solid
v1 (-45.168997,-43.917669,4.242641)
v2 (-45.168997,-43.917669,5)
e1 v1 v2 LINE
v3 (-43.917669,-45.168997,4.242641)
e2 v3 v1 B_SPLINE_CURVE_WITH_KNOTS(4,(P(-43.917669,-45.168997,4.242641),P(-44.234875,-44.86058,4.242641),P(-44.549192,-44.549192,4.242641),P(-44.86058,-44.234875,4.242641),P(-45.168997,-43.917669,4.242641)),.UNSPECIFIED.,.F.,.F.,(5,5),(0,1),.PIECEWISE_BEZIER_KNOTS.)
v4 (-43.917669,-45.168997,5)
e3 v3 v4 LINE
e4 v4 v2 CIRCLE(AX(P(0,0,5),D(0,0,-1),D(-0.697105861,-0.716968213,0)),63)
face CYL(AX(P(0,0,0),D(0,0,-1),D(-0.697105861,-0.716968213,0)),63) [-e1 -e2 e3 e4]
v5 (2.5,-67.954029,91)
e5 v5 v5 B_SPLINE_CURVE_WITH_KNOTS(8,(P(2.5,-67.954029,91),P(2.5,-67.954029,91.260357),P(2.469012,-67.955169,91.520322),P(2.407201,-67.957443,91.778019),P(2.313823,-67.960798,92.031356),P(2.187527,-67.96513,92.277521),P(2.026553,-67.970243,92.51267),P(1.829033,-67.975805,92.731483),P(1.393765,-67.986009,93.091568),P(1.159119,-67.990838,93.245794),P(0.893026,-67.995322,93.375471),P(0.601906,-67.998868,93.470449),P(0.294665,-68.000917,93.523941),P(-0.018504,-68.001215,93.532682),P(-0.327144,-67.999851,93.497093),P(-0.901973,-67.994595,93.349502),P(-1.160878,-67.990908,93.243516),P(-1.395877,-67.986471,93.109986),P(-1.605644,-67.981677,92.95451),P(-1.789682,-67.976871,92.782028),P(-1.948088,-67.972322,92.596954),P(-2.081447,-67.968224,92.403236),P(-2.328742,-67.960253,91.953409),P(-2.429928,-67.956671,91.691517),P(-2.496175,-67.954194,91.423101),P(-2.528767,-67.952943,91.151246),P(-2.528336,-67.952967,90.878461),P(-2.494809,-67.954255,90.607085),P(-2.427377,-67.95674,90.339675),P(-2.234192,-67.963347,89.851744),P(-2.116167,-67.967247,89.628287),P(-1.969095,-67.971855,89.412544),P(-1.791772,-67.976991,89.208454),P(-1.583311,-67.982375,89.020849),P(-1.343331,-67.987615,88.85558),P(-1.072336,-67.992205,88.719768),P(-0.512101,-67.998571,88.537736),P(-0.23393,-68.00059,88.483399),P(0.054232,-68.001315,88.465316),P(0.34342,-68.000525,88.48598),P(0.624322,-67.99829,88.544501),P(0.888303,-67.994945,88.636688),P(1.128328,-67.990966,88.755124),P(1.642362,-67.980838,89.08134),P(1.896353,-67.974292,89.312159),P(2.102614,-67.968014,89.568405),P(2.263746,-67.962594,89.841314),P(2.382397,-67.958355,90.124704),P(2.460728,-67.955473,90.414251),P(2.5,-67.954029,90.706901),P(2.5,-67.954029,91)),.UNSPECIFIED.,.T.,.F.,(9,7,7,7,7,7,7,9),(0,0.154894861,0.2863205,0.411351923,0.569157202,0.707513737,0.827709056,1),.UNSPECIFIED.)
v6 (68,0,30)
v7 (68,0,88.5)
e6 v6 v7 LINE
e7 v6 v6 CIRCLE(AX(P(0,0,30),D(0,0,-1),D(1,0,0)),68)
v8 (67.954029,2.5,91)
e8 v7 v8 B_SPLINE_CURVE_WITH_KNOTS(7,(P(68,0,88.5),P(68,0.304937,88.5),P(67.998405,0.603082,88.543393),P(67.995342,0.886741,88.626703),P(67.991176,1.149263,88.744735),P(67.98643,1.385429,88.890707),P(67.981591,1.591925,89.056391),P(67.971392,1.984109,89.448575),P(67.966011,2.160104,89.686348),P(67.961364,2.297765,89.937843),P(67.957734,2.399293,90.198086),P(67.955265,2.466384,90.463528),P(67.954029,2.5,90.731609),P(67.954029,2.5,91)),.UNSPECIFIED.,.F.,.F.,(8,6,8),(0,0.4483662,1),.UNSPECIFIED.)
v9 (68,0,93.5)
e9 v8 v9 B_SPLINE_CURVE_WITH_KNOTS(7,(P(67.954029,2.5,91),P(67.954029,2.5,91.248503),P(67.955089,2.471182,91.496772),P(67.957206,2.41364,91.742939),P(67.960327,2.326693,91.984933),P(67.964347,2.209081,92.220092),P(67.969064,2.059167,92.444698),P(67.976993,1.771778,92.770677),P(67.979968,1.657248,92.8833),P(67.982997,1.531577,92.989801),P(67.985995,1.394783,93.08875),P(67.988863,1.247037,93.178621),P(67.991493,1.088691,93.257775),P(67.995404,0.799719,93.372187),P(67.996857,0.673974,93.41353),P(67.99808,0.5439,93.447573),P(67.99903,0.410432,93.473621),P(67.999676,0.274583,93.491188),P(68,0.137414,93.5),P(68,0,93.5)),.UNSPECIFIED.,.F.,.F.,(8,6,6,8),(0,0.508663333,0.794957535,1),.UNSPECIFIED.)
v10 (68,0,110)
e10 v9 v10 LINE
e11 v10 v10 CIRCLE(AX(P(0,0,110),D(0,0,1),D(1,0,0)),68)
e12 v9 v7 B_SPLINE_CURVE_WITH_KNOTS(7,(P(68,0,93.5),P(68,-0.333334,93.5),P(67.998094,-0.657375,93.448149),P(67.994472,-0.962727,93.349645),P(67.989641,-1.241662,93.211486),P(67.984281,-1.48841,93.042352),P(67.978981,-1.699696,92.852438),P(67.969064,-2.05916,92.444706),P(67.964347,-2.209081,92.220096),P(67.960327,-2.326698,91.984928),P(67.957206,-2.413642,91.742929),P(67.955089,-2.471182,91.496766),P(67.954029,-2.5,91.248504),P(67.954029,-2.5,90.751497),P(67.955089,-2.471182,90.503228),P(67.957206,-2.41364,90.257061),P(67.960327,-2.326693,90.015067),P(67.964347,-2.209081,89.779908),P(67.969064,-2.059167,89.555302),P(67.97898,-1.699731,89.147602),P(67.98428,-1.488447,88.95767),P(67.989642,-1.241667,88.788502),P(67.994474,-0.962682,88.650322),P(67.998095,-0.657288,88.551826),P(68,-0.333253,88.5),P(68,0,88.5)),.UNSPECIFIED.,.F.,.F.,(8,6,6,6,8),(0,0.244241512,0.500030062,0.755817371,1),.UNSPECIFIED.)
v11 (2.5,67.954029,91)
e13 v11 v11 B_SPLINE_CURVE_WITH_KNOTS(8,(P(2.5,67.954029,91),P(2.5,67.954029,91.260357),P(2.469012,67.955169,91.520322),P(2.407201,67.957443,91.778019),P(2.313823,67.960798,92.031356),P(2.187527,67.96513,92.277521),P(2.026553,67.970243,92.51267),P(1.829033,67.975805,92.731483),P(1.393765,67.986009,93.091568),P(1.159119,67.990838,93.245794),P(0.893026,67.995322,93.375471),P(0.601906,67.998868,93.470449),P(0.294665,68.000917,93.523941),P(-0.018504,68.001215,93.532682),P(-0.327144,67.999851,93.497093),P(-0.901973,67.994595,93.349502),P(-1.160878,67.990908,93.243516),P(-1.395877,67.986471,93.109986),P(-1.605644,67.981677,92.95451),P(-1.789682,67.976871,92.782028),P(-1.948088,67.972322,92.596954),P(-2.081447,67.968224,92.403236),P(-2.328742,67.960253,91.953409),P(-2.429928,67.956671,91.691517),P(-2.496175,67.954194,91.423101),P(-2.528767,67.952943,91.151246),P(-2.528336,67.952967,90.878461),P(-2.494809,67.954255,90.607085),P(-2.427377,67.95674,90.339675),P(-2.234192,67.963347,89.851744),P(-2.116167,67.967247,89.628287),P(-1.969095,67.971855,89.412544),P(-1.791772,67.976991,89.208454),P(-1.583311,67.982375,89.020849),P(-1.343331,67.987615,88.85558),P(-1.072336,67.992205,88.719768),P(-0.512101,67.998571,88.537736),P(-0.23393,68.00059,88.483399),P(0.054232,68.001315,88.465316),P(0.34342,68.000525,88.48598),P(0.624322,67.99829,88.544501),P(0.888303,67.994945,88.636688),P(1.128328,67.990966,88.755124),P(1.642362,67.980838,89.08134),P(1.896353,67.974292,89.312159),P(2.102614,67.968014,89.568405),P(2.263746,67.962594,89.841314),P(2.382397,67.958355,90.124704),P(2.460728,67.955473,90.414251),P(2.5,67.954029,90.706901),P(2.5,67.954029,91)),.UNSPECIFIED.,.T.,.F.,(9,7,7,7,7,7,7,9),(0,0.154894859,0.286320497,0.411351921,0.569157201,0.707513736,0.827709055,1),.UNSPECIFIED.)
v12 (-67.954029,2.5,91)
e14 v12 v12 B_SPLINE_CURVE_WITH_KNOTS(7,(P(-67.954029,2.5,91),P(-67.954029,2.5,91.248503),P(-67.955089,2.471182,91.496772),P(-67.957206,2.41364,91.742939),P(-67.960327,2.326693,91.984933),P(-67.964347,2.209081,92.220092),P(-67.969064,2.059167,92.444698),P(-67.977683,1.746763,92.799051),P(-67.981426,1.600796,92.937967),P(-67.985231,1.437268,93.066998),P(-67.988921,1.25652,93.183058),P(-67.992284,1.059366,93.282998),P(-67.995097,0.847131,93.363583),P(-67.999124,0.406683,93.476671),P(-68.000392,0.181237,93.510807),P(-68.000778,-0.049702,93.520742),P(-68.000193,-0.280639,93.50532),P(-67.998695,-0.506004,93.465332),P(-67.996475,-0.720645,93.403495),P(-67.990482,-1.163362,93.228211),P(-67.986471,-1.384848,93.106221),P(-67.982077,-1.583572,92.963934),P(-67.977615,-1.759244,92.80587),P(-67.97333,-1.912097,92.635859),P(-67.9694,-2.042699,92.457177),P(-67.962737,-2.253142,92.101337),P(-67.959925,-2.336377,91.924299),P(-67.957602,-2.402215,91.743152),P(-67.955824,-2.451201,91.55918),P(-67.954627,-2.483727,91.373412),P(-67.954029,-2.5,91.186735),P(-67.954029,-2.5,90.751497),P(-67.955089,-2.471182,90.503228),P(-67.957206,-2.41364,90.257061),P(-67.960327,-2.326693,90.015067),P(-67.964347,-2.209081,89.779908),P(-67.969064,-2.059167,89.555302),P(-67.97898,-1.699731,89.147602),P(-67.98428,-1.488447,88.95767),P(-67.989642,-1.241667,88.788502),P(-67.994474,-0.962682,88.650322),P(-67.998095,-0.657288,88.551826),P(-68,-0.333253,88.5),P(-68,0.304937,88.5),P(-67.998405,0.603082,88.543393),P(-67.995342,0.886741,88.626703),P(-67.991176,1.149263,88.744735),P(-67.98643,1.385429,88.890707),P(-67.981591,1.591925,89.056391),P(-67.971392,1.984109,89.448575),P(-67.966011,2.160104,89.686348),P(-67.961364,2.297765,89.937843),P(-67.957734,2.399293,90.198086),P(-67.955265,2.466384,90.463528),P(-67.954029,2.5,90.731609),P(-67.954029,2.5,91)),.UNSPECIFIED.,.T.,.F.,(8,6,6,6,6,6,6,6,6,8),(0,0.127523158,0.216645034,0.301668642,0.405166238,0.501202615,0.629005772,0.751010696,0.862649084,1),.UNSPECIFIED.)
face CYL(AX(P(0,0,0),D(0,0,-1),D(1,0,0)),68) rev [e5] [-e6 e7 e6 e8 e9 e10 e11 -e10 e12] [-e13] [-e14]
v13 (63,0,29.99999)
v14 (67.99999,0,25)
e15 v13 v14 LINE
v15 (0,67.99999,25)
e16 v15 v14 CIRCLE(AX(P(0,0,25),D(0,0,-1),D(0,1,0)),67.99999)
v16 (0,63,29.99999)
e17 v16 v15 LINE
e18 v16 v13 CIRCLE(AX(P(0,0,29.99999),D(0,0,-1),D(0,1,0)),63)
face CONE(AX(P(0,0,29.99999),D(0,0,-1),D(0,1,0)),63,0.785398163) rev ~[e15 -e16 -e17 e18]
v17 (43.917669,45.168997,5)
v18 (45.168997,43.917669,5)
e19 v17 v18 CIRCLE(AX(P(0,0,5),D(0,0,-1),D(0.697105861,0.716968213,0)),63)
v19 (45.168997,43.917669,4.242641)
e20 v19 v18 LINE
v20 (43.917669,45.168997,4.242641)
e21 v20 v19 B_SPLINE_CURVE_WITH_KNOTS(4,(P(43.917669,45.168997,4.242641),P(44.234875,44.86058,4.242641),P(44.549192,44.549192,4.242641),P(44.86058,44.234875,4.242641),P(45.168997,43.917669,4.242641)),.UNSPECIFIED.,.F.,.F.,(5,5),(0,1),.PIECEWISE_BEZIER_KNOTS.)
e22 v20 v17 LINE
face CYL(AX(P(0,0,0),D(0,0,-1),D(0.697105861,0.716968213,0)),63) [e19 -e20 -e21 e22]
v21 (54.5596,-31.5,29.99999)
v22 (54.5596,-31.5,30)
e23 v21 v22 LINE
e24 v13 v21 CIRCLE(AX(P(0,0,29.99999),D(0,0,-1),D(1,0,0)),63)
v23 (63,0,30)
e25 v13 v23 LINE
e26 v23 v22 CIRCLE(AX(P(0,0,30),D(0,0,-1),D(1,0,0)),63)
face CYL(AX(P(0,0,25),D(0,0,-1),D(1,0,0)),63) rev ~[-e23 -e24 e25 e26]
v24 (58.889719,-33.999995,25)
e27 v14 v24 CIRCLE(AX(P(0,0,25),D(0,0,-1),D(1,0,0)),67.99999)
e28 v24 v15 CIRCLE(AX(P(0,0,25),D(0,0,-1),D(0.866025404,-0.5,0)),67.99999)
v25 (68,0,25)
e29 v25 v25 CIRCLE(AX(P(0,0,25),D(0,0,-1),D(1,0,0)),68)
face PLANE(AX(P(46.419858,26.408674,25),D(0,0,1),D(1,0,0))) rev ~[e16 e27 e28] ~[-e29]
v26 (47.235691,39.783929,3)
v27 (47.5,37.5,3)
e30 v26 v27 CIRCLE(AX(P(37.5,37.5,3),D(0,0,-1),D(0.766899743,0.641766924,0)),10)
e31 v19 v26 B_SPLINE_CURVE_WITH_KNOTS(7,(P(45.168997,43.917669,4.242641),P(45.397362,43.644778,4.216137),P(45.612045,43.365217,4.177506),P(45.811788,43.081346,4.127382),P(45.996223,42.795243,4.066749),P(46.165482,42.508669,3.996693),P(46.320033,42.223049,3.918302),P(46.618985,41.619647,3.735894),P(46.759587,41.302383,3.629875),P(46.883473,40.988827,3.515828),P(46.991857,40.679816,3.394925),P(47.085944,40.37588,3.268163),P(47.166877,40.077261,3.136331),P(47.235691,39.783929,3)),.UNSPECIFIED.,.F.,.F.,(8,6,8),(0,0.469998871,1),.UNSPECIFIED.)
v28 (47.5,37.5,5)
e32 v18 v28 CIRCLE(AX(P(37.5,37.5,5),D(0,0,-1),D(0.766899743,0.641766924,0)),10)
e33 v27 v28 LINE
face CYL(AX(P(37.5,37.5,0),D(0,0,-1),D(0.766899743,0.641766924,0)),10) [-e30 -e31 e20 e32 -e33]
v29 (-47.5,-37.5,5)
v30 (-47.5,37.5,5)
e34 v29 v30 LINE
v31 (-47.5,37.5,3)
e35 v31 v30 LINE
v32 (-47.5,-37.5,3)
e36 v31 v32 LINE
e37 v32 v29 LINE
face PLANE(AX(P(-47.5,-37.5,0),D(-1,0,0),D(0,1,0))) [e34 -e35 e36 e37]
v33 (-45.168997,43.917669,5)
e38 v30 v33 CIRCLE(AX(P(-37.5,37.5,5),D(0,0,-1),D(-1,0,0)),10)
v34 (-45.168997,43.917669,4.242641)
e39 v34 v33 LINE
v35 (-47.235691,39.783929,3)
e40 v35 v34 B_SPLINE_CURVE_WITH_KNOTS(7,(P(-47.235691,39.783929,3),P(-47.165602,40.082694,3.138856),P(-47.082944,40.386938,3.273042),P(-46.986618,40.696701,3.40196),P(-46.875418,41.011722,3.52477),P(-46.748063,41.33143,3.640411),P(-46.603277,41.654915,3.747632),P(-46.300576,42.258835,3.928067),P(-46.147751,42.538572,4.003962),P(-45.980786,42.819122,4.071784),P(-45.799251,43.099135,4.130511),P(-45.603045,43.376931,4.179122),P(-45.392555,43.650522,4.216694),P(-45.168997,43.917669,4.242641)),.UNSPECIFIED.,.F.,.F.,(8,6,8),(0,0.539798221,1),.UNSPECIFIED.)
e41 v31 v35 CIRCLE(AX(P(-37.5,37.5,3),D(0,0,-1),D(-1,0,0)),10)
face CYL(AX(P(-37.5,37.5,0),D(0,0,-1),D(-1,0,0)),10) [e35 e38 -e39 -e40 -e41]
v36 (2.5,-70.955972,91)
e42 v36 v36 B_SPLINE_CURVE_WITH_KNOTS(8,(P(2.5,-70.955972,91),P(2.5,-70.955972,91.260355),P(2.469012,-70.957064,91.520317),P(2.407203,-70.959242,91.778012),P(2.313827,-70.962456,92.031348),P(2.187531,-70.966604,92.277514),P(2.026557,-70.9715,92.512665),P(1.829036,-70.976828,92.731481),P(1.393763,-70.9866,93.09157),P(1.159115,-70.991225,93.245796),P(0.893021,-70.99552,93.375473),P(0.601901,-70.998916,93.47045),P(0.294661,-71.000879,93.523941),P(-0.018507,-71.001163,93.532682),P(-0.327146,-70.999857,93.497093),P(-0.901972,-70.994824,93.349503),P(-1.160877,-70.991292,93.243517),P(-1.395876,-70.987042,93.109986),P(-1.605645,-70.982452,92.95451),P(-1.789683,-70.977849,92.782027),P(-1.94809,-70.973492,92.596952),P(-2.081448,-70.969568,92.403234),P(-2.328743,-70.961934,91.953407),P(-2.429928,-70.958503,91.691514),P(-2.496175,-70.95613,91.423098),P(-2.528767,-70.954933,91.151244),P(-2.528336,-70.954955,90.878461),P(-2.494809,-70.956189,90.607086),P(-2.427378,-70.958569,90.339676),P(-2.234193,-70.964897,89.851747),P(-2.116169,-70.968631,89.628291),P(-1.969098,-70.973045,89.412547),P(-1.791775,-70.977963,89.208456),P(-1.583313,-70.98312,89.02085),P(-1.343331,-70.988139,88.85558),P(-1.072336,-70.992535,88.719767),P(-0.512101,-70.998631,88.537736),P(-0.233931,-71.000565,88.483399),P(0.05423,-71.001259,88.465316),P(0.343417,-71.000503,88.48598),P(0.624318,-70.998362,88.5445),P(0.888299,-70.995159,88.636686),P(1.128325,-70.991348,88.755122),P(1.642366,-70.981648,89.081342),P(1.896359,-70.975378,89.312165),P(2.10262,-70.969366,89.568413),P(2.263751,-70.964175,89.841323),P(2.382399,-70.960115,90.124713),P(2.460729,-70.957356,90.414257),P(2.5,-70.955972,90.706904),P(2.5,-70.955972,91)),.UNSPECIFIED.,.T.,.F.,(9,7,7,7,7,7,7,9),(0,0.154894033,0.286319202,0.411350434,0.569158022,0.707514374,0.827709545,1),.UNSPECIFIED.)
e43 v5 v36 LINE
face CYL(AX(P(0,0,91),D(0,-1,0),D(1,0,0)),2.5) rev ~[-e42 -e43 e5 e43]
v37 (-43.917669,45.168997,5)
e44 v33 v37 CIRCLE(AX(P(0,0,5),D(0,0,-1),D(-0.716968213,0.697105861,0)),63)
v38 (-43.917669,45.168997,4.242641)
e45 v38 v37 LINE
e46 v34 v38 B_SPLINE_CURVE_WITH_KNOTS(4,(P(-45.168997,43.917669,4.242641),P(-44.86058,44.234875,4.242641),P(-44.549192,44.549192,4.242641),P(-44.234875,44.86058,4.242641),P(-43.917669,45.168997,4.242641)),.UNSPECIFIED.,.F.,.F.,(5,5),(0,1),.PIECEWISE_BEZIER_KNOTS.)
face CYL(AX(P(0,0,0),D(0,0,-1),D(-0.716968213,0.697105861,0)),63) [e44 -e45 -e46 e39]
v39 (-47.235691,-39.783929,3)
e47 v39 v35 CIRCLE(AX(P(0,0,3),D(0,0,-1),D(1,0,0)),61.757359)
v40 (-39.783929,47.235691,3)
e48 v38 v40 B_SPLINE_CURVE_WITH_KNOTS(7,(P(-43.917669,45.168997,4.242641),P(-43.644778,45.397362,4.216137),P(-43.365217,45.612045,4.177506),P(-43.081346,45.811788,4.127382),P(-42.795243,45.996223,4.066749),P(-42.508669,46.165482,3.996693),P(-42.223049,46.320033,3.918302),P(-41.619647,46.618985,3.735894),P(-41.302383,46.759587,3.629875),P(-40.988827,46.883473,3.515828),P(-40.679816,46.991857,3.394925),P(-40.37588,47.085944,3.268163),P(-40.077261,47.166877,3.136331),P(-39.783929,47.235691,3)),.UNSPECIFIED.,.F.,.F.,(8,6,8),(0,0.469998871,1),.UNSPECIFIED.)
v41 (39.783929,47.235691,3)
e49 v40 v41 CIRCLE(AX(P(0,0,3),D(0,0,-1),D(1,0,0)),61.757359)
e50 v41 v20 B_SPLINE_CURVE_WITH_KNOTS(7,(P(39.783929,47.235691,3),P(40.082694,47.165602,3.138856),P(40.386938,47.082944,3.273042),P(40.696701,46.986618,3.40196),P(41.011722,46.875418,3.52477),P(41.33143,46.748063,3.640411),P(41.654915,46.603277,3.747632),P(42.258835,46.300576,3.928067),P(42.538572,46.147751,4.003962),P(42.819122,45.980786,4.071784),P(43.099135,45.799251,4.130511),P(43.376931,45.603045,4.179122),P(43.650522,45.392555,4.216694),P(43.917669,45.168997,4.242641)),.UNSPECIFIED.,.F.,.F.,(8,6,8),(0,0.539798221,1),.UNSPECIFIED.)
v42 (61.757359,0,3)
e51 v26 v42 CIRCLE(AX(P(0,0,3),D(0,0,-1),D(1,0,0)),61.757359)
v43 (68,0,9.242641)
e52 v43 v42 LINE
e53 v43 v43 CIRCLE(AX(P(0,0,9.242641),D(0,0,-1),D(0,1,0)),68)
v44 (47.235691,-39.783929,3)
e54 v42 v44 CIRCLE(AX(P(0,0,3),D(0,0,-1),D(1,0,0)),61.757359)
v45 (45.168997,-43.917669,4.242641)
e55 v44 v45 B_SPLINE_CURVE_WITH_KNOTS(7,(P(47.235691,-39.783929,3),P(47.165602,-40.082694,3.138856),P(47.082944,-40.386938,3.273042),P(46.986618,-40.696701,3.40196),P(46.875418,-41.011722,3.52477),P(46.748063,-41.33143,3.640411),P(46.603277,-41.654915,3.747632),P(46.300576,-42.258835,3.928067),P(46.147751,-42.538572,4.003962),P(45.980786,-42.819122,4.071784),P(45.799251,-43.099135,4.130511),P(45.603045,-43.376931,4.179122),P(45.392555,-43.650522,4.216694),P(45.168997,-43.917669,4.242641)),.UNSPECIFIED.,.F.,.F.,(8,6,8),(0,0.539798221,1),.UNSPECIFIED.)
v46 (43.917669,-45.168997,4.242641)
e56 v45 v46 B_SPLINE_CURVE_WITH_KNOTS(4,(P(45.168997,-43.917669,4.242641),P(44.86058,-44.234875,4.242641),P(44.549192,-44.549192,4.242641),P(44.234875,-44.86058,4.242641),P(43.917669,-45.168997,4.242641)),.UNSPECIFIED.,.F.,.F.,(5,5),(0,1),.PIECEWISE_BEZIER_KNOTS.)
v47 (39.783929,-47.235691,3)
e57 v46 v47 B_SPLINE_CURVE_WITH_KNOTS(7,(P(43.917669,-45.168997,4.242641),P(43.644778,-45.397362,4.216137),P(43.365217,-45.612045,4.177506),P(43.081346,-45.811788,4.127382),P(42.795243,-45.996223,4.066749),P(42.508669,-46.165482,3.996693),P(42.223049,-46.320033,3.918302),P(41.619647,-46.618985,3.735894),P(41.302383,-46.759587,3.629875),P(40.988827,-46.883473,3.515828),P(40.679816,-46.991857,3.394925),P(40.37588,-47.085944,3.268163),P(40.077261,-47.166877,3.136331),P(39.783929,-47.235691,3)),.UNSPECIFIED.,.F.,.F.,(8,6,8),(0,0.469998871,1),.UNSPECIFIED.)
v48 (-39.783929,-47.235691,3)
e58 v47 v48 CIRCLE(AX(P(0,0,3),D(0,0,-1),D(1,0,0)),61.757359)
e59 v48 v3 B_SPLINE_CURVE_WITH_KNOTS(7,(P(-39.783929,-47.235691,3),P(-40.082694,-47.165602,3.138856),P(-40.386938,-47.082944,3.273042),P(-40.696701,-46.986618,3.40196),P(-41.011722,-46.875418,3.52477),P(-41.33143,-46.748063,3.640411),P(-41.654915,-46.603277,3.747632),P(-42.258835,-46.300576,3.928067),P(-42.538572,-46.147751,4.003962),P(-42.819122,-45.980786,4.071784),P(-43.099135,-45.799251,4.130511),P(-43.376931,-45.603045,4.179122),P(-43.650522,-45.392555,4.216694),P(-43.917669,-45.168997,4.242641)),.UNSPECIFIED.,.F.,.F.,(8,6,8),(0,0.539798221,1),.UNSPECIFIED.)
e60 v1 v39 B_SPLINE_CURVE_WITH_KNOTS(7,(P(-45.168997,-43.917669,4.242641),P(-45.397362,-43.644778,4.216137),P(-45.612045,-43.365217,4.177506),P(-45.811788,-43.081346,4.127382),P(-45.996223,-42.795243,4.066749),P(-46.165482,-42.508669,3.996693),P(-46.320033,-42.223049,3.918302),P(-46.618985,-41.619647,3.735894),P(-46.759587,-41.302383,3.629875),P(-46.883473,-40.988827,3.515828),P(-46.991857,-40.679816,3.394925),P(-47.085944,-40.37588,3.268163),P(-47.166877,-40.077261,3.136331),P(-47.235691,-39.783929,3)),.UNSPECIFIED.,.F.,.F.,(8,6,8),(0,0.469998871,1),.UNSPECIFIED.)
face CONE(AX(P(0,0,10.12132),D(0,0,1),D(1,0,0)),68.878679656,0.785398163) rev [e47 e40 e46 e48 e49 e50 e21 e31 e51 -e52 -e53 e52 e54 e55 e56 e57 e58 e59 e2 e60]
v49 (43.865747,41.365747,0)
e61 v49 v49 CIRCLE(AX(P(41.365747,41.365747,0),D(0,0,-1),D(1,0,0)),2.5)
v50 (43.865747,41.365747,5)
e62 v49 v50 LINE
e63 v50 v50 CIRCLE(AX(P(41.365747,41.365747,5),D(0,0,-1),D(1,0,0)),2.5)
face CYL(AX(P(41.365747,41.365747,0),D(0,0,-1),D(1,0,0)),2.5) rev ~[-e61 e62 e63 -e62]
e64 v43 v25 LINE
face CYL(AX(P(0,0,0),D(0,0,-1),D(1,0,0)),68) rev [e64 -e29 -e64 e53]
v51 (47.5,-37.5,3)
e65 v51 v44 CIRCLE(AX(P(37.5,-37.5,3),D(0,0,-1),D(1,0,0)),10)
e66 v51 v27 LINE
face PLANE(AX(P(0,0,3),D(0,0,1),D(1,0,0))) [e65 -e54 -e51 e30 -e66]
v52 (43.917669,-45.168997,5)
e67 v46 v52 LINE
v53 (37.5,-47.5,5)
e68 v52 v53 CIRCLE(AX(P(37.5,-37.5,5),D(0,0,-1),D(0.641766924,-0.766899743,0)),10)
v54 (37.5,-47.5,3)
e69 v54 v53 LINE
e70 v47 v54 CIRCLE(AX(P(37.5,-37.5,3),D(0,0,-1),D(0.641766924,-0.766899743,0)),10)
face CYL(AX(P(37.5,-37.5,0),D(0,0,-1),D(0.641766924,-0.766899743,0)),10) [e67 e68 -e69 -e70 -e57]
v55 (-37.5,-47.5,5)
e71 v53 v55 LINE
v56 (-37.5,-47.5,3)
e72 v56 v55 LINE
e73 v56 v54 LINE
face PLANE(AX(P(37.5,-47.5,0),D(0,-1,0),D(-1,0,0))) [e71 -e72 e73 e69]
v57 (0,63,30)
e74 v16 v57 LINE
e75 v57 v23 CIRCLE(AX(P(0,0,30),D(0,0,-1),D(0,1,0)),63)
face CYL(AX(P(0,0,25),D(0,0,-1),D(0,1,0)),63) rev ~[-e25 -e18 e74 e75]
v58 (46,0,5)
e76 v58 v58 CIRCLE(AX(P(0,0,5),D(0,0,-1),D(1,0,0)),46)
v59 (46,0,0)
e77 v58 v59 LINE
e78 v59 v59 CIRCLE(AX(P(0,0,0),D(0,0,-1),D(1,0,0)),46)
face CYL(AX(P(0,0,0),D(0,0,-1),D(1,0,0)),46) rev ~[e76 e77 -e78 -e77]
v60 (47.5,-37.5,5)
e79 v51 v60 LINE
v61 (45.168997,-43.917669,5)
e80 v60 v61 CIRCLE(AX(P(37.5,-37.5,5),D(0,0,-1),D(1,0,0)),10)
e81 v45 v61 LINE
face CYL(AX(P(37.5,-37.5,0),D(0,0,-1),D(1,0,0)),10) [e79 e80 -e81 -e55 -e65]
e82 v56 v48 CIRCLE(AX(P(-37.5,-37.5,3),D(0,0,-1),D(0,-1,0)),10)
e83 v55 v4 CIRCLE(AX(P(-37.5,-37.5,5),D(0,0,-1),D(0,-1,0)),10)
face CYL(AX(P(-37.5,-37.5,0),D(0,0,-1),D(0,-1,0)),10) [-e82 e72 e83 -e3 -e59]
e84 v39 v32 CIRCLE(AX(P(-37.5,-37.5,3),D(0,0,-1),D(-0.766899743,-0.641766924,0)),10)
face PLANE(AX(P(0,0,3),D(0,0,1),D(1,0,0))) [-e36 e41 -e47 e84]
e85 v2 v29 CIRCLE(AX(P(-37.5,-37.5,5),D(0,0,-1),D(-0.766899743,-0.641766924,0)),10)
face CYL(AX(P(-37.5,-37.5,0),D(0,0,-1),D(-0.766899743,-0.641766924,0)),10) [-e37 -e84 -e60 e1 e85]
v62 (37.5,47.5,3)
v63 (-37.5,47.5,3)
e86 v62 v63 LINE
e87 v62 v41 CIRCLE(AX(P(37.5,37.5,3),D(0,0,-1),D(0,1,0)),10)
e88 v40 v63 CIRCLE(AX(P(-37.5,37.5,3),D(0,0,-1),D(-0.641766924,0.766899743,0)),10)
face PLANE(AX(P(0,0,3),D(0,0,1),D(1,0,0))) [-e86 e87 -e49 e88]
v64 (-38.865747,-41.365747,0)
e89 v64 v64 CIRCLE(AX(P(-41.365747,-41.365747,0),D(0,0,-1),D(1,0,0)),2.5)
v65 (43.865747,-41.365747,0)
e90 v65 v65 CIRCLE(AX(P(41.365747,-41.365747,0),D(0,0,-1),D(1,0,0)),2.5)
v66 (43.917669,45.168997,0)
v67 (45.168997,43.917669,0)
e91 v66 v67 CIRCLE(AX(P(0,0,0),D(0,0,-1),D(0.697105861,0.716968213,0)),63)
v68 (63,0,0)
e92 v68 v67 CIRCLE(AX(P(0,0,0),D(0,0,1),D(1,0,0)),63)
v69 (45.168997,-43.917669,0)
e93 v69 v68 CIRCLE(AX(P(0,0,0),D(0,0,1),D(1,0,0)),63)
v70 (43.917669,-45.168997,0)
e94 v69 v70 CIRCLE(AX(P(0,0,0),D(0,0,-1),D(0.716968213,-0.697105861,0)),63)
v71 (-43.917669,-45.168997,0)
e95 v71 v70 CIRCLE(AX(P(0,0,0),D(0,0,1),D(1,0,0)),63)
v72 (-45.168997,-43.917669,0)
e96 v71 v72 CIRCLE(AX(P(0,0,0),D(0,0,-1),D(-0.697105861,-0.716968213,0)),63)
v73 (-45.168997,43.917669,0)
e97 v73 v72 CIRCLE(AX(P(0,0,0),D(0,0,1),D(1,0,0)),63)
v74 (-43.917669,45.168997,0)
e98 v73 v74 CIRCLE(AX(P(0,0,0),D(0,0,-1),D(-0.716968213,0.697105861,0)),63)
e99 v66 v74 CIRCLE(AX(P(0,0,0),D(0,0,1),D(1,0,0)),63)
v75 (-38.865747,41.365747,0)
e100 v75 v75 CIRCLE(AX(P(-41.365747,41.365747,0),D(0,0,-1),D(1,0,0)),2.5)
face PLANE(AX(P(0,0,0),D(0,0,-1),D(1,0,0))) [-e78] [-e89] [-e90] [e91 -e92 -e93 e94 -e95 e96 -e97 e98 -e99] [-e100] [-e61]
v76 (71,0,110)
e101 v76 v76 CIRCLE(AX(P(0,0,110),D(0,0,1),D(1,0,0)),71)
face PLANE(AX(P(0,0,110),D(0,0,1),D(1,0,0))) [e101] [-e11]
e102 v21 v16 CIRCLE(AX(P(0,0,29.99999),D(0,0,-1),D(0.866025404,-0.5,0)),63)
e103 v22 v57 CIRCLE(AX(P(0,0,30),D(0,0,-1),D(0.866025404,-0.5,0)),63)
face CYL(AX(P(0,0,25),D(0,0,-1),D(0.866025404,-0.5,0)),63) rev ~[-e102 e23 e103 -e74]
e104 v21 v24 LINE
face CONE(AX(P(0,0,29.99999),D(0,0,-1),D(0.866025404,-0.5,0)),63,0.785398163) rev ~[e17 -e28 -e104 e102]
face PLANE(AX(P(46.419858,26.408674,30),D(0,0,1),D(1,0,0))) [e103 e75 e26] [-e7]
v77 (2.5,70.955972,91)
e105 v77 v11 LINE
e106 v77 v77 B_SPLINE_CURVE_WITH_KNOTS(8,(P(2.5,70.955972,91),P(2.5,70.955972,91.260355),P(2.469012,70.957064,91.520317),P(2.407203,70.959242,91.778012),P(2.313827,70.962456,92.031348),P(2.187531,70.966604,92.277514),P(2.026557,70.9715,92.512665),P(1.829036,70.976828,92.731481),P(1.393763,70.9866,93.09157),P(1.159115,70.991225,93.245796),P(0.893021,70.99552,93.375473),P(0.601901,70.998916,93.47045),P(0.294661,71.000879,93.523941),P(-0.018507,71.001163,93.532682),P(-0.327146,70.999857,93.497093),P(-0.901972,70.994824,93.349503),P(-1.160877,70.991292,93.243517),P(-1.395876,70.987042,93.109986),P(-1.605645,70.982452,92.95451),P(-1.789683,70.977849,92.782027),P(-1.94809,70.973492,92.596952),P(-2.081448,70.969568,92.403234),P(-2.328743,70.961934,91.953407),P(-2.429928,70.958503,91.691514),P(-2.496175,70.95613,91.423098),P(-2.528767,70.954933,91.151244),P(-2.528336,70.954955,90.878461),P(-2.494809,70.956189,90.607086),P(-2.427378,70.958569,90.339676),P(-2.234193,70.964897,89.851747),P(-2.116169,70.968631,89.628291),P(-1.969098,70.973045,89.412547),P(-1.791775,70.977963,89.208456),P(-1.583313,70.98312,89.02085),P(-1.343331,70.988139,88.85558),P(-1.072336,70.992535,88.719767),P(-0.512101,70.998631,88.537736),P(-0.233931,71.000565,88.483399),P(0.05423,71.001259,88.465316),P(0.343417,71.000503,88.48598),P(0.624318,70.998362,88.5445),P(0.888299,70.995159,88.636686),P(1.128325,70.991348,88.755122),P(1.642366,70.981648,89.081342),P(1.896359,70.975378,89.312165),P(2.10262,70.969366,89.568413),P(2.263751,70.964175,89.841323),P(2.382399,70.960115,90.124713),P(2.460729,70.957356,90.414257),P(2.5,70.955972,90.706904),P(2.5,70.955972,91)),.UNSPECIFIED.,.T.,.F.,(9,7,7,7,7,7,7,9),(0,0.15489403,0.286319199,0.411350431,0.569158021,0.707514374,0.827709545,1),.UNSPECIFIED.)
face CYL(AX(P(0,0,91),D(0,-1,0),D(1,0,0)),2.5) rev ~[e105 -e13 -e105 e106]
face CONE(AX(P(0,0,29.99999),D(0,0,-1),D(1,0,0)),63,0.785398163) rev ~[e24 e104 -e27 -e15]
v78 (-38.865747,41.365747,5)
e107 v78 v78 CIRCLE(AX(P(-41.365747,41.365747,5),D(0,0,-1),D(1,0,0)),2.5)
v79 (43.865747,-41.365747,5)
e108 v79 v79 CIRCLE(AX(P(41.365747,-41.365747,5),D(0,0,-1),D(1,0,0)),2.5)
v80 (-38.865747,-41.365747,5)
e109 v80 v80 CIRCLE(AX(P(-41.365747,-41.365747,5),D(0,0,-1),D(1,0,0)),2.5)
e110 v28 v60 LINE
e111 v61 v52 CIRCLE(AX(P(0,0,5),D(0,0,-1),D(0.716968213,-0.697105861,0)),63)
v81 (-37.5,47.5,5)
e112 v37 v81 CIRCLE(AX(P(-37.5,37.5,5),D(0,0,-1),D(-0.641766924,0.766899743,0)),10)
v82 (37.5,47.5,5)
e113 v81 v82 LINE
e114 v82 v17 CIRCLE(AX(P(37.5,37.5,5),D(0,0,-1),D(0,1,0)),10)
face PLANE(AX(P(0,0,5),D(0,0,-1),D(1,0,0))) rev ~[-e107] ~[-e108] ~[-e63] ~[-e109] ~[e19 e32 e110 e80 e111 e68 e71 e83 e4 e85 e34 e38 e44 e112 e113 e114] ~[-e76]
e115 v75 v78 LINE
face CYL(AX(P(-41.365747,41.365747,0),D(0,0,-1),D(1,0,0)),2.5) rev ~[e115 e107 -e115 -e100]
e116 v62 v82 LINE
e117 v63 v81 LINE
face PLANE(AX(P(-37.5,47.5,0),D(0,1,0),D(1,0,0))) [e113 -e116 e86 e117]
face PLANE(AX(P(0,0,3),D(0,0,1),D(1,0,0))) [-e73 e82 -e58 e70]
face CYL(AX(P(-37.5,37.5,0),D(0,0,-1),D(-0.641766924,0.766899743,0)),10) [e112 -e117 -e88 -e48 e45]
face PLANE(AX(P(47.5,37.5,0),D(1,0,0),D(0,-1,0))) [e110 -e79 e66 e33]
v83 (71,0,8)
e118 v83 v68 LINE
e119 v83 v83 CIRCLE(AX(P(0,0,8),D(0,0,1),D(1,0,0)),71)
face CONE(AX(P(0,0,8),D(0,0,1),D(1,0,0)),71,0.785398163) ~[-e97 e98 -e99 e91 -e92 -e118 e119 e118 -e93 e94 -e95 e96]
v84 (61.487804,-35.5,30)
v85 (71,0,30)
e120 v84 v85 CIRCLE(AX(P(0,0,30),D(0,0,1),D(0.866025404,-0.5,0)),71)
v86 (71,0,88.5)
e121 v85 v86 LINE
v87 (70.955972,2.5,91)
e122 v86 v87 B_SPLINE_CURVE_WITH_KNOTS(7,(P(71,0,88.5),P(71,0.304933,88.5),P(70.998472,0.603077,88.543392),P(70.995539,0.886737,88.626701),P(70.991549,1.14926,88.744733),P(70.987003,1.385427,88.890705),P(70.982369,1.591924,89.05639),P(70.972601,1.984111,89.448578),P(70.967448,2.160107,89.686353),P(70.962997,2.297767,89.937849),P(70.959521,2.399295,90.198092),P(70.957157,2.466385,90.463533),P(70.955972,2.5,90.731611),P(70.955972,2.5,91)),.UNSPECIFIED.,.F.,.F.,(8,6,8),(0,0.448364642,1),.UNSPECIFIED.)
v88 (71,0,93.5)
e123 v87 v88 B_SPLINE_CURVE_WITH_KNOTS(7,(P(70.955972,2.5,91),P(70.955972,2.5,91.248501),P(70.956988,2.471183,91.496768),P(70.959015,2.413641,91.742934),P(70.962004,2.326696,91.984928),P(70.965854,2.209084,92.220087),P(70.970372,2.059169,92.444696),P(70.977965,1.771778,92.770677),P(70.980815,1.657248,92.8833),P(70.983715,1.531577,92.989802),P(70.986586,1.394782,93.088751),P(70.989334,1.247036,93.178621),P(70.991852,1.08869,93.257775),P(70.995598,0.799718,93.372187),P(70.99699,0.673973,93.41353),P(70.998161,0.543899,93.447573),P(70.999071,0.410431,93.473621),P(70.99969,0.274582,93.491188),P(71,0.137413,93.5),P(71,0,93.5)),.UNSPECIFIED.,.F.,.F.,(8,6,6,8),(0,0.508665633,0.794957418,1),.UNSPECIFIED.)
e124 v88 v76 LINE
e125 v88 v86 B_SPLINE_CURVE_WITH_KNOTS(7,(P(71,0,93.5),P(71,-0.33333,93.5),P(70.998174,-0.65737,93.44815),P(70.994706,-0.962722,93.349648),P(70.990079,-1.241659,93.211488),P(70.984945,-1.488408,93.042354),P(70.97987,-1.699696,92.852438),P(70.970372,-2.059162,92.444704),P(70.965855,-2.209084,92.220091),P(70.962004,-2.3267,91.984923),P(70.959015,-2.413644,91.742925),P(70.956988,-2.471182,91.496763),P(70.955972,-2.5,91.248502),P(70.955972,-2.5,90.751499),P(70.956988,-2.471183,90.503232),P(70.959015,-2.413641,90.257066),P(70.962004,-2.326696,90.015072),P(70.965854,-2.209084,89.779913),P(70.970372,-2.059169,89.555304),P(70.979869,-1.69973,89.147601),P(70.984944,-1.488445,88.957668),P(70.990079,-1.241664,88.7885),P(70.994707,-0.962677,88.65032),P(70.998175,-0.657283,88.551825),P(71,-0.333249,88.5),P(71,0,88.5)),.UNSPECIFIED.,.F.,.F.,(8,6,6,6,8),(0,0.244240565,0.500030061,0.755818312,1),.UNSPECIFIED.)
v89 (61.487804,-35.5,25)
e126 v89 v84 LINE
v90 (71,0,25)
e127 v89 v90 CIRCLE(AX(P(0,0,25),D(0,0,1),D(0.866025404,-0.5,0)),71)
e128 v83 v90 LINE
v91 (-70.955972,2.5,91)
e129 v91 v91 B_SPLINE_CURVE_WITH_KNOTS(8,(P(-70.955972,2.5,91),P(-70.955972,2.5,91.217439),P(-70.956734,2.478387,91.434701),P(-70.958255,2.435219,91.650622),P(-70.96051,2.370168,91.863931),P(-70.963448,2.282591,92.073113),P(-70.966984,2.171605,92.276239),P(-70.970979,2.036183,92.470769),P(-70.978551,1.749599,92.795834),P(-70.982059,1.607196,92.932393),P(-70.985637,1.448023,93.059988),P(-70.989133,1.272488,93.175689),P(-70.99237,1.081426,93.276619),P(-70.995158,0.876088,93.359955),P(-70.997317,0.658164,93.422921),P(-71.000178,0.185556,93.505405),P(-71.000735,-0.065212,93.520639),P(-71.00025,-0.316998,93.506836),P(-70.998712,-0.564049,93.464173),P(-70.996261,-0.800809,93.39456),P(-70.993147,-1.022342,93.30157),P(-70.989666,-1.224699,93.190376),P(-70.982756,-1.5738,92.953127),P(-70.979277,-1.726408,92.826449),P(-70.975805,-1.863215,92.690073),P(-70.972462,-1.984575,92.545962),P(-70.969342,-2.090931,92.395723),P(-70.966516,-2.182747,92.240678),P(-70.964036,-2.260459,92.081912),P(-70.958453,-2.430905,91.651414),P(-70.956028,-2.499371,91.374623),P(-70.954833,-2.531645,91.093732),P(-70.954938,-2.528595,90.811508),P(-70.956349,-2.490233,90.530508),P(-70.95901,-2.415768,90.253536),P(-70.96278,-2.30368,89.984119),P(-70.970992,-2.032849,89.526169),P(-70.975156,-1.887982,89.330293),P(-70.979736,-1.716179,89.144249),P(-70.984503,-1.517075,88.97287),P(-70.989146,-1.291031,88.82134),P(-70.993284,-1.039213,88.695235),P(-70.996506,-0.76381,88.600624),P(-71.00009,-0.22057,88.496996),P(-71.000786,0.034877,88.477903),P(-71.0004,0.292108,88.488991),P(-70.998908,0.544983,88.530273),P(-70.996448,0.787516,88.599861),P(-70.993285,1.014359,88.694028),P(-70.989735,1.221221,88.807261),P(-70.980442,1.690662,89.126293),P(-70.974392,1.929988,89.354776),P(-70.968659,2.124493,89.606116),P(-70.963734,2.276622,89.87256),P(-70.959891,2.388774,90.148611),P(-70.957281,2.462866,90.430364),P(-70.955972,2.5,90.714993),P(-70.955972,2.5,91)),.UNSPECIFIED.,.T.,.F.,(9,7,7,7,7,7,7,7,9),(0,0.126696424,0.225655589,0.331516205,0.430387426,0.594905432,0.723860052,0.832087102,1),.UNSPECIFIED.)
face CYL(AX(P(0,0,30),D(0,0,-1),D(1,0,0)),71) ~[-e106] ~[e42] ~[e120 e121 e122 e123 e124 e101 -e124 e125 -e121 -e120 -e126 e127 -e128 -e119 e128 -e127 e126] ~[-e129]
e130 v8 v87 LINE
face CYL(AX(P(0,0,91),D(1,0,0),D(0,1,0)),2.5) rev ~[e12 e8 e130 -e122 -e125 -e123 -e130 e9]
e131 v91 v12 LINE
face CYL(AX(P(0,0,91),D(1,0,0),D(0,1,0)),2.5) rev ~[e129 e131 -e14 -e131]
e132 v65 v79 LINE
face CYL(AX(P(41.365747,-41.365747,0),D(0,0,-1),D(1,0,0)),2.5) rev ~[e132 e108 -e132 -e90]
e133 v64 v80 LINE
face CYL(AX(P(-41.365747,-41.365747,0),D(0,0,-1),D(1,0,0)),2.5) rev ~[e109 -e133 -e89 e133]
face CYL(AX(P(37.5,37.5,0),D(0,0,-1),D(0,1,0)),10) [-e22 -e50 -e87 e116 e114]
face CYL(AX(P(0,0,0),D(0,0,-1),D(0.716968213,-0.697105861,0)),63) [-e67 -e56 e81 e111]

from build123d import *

# Parameters (mm, degrees)
F0_R      = 71
F1_DEPTH  = 50
F2_SIZE   = 8
F3_T      = -3
F4_R      = 2.5
F4_R_2    = 46
F5_DEPTH  = 5
F6_DEPTH  = 12.5
F9_DEPTH  = 5
F10_SIZE  = 4.99999
F11_R     = 71
F11_R_2   = 68
F12_DEPTH = 80
F13_R     = 2.5
F14_DEPTH = 75
F15_R     = 2.5
F16_DEPTH = 75


# Not quite as in the source:
# - a fillet or chamfer is up to 0.001 mm smaller than in the source, because OpenCascade refuses the exact size


with BuildPart() as f1:
    # F0 (on Top) → F1 (new body)
    with BuildSketch(Plane.XY):
        Circle(F0_R)
    extrude(amount=F1_DEPTH)

    # F2
    f2_edges = [f1.edges().sort_by_distance(p)[0] for p in [
        (-71, 0, 0),
    ]]
    chamfer(f2_edges, length=F2_SIZE)

    # F3
    f3_openings = [f1.faces().sort_by_distance(p)[0] for p in [
        (0, 0, 50),
    ]]
    offset(amount=F3_T, openings=f3_openings)

    # F4 (on face) → F5 (join)
    with BuildSketch(Plane(origin=(0, 0, 0), x_dir=(1, 0, 0), z_dir=(0, 0, -1))):
        with BuildLine():
            Line((37.5, 47.5), (-37.5, 47.5))
            ThreePointArc((-37.5, 47.5), (-40.9139438887, 46.8992014089), (-43.9176692417, 45.168997425))
            ThreePointArc((-43.9176692417, 45.168997425), (-44.5477272148, 44.5477272148), (-45.168997425, 43.9176692417))
            ThreePointArc((-45.168997425, 43.9176692417), (-46.8992014089, 40.9139438887), (-47.5, 37.5))
            Line((-47.5, 37.5), (-47.5, -37.5))
            ThreePointArc((-47.5, -37.5), (-46.8992014089, -40.9139438887), (-45.168997425, -43.9176692417))
            ThreePointArc((-45.168997425, -43.9176692417), (-44.5477272148, -44.5477272148), (-43.9176692417, -45.168997425))
            ThreePointArc((-43.9176692417, -45.168997425), (-40.9139438887, -46.8992014089), (-37.5, -47.5))
            Line((-37.5, -47.5), (37.5, -47.5))
            ThreePointArc((37.5, -47.5), (40.9139438887, -46.8992014089), (43.9176692417, -45.168997425))
            ThreePointArc((43.9176692417, -45.168997425), (44.5477272148, -44.5477272148), (45.168997425, -43.9176692417))
            ThreePointArc((45.168997425, -43.9176692417), (46.8992014089, -40.9139438887), (47.5, -37.5))
            Line((47.5, -37.5), (47.5, 37.5))
            ThreePointArc((47.5, 37.5), (46.8992014089, 40.9139438887), (45.168997425, 43.9176692417))
            ThreePointArc((45.168997425, 43.9176692417), (44.5477272148, 44.5477272148), (43.9176692417, 45.168997425))
            ThreePointArc((43.9176692417, 45.168997425), (40.9139438887, 46.8992014089), (37.5, 47.5))
        make_face()
        with Locations((-41.3657466994, -41.3657466994)):
            Circle(F4_R, mode=Mode.SUBTRACT)
        with Locations((41.3657466994, -41.3657466994)):
            Circle(F4_R, mode=Mode.SUBTRACT)
        with Locations((-41.3657466994, 41.3657466994)):
            Circle(F4_R, mode=Mode.SUBTRACT)
        Circle(F4_R_2, mode=Mode.SUBTRACT)
        with Locations((41.3657466994, 41.3657466994)):
            Circle(F4_R, mode=Mode.SUBTRACT)
        with Locations((-41.3657466994, 41.3657466994)):
            Circle(F4_R)
        with Locations((41.3657466994, 41.3657466994)):
            Circle(F4_R)
        with Locations((41.3657466994, -41.3657466994)):
            Circle(F4_R)
        with Locations((-41.3657466994, -41.3657466994)):
            Circle(F4_R)
    extrude(amount=-F5_DEPTH)

    # F4 (on face) → F6 (cut, symmetric)
    with BuildSketch(Plane(origin=(0, 0, 0), x_dir=(1, 0, 0), z_dir=(0, 0, -1))):
        with Locations((-41.3657466994, 41.3657466994)):
            Circle(F4_R)
        with Locations((41.3657466994, 41.3657466994)):
            Circle(F4_R)
        with Locations((41.3657466994, -41.3657466994)):
            Circle(F4_R)
        with Locations((-41.3657466994, -41.3657466994)):
            Circle(F4_R)
        Circle(F4_R_2)
    extrude(amount=F6_DEPTH, both=True, mode=Mode.SUBTRACT)

    # F8 (on offset) → F9 (join)
    with BuildSketch(Plane.XY.offset(25)):
        with BuildLine():
            ThreePointArc((61.4878036687, -35.5), (68.5807336665, -18.3761522023), (71, 0))
            ThreePointArc((71, 0), (50.2045814642, 50.2045814642), (0, 71))
            Line((0, 71), (0, 63))
            ThreePointArc((0, 63), (44.5477272148, 44.5477272148), (63, 0))
            ThreePointArc((63, 0), (60.8533270562, -16.3055998415), (54.5596004384, -31.5))
            Line((54.5596004384, -31.5), (61.4878036687, -35.5))
        make_face()
        with BuildLine():
            Line((0, 63), (0, 71))
            ThreePointArc((0, 71), (-61.4878036687, 35.5), (-61.4878036687, -35.5))
            Line((-61.4878036687, -35.5), (-54.5596004384, -31.5))
            ThreePointArc((-54.5596004384, -31.5), (-54.5596004384, 31.5), (0, 63))
        make_face()
        with BuildLine():
            ThreePointArc((-61.4878036687, -35.5), (0, -71), (61.4878036687, -35.5))
            Line((61.4878036687, -35.5), (54.5596004384, -31.5))
            ThreePointArc((54.5596004384, -31.5), (0, -63), (-54.5596004384, -31.5))
            Line((-54.5596004384, -31.5), (-61.4878036687, -35.5))
        make_face()
    extrude(amount=F9_DEPTH)

    # F10 (size 5 in the source; OpenCascade refuses exactly that, so slightly less here)
    f10_edges = [f1.edges().sort_by_distance(p)[0] for p in [
        (-54.5596, 31.5, 25),
    ]]
    chamfer(f10_edges, length=F10_SIZE)

    # F11 (on face) → F12 (join)
    with BuildSketch(Plane.XY.offset(30)):
        Circle(F11_R)
        Circle(F11_R_2, mode=Mode.SUBTRACT)
    extrude(amount=F12_DEPTH)

    # F13 (on Front) → F14 (cut, symmetric)
    with BuildSketch(Plane.XZ):
        with Locations((0, 91)):
            Circle(F13_R)
    extrude(amount=F14_DEPTH, both=True, mode=Mode.SUBTRACT)

    # F15 (on Right) → F16 (cut, symmetric)
    with BuildSketch(Plane.YZ):
        with Locations((0, 91)):
            Circle(F15_R)
    extrude(amount=F16_DEPTH, both=True, mode=Mode.SUBTRACT)


solid = f1.part
